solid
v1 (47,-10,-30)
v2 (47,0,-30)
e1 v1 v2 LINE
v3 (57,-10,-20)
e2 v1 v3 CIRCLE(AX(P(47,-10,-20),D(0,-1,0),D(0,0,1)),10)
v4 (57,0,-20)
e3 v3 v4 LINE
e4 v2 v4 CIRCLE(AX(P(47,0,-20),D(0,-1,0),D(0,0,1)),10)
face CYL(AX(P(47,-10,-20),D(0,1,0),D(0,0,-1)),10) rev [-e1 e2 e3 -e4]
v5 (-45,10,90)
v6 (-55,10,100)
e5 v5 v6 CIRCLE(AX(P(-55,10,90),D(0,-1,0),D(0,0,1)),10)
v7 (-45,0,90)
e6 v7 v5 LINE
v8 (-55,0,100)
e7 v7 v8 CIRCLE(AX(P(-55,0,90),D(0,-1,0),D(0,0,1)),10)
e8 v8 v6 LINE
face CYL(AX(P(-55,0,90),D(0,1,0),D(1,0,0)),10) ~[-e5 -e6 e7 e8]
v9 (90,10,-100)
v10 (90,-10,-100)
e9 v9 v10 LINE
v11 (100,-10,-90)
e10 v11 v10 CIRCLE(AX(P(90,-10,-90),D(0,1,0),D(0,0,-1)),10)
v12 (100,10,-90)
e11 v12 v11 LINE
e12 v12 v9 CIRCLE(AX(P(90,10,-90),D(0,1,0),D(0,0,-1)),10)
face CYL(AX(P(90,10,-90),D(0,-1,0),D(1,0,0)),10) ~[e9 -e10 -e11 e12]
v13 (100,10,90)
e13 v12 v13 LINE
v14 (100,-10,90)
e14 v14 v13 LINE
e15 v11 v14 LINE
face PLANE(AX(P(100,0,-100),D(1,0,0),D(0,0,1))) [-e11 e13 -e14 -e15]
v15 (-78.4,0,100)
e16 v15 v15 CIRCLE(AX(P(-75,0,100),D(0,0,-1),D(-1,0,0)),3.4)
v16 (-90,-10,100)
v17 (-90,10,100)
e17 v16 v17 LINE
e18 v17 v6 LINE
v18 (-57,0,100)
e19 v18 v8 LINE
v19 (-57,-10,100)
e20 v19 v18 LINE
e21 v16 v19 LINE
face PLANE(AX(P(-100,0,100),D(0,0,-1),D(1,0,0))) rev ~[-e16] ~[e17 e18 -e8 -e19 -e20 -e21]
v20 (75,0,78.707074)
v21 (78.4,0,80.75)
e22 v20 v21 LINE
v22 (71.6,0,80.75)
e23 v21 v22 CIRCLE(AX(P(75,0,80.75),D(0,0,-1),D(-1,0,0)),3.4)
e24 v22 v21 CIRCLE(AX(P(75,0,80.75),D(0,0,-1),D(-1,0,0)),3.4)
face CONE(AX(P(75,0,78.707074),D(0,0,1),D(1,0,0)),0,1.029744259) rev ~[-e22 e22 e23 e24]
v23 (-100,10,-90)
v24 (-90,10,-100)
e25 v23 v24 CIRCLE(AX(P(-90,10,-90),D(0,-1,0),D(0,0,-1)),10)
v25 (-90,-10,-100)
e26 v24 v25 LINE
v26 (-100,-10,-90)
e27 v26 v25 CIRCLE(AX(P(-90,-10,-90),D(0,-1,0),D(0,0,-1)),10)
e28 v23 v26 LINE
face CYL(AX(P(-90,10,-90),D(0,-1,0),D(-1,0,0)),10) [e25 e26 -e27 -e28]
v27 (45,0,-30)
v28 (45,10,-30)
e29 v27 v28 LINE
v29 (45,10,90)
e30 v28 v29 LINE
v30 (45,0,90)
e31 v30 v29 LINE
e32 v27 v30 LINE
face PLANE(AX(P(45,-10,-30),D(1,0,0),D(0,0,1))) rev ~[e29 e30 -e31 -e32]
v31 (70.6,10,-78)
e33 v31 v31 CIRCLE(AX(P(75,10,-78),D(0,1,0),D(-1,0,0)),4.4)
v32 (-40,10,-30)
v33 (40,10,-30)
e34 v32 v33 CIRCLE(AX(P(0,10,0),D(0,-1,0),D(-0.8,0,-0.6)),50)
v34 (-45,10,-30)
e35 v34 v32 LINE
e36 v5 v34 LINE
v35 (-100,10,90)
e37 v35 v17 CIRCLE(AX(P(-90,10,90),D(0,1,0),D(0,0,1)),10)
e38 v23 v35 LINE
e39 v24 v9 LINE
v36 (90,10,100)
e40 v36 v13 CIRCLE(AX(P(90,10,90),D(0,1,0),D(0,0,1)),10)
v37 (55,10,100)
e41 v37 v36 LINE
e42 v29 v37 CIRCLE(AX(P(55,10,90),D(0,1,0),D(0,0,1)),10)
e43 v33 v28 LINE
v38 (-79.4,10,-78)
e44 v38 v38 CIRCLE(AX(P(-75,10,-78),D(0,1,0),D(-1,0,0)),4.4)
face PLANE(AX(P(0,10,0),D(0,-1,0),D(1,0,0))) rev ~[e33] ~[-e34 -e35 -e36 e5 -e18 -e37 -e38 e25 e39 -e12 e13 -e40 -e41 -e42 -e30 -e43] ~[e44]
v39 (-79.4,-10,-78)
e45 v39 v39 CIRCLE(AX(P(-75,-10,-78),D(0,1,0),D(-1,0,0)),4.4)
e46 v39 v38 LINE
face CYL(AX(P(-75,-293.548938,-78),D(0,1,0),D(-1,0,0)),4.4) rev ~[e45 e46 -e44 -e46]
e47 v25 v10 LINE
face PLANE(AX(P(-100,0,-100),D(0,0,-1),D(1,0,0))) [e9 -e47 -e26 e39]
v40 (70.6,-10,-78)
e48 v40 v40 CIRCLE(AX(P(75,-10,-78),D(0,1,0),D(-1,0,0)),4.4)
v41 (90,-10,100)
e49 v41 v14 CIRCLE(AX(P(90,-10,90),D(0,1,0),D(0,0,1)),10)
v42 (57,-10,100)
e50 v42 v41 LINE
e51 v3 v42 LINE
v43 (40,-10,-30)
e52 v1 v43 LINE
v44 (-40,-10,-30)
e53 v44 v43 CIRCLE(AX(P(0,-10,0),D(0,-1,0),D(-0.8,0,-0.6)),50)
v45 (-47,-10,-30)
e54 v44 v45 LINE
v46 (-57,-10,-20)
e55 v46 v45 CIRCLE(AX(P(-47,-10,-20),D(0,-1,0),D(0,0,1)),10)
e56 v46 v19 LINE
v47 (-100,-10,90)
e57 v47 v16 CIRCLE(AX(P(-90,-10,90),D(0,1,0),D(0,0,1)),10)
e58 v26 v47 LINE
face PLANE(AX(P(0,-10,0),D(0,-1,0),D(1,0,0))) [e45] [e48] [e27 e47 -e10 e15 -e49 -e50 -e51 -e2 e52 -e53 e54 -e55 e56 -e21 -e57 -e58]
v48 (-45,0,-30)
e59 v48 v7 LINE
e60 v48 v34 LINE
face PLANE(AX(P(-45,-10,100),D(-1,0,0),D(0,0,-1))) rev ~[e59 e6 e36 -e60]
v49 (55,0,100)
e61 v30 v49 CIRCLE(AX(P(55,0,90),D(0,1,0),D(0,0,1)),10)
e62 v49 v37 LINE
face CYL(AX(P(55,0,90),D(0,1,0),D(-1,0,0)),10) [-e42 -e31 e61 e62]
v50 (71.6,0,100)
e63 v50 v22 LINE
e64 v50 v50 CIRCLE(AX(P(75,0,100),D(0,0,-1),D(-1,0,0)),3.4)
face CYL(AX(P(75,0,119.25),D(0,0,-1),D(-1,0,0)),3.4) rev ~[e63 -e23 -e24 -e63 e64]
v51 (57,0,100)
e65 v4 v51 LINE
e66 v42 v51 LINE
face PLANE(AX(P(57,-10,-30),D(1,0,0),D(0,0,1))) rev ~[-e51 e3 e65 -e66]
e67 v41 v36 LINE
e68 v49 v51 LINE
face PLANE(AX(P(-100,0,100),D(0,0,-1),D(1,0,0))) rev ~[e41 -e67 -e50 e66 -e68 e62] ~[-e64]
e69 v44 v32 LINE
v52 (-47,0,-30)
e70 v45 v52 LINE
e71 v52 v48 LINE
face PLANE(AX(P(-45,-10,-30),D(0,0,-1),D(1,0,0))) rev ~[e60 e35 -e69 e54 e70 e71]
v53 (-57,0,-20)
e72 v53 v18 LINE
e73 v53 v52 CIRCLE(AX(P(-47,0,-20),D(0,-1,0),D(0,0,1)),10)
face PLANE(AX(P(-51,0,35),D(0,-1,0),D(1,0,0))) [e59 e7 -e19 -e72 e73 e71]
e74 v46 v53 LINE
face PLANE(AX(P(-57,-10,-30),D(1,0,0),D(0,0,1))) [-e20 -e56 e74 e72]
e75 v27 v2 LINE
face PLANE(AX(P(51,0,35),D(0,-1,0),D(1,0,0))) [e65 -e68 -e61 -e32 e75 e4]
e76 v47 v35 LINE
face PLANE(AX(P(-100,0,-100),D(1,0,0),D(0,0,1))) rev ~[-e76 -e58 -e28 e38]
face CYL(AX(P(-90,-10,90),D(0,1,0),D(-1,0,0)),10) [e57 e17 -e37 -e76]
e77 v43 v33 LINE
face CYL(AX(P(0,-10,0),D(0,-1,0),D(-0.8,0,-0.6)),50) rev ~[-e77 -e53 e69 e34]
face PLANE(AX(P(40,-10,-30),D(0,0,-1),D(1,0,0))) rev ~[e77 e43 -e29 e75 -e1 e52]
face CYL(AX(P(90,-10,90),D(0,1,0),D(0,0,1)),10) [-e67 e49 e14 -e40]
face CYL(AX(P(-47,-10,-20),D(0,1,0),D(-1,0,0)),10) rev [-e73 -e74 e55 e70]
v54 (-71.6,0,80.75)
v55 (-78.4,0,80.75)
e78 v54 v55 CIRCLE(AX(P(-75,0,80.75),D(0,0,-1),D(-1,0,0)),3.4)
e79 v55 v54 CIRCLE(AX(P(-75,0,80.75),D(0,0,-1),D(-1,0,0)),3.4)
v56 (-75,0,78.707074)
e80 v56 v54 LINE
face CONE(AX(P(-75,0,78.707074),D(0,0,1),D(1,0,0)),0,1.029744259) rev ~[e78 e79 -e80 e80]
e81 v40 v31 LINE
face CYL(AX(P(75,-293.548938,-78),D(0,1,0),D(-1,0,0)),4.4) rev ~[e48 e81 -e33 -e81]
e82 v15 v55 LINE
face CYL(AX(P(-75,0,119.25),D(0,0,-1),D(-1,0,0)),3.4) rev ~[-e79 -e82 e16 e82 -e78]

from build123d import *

# Parameters (mm, degrees)
F0_W      = 200
F0_H      = 200
F1_DEPTH  = 10
F2_R      = 15
F3_DEPTH  = 20.001
F5_D      = 8.8
F7_DEPTH  = 20.001
F8_W      = 12
F8_H      = 130
F9_DEPTH  = 10
F10_R     = 10
F13_D     = 6.8
F13_DEPTH = 19.25
F13_TIP   = 2.0429261047


# Not quite as in the source:
# - two fillets or chamfers of one size are made in one step
# - a feature names something its author has since deleted; it is built from what else it names


with BuildPart() as f1:
    # F0 (on Front) → F1 (new body, symmetric)
    with BuildSketch(Plane.XZ):
        Rectangle(F0_W, F0_H)
    extrude(amount=F1_DEPTH, both=True)

    # F2 (on face) → F3 (cut, through all)
    with BuildSketch(Plane.XZ.offset(10)):
        Circle(F2_R)
    extrude(amount=-F3_DEPTH, mode=Mode.SUBTRACT)

    # F5 (through all)
    with Locations(Plane.XZ.offset(10)):
        with Locations((-75, -78), (75, -78)):
            Hole(F5_D / 2)

    # F6 (on face) → F7 (cut, through all)
    with BuildSketch(Plane.XZ.offset(10)):
        with BuildLine():
            Line((45, 100), (-45, 100))
            Line((-45, 100), (-45, -30))
            Line((-45, -30), (-40, -30))
            ThreePointArc((-40, -30), (0, -50), (40, -30))
            Line((40, -30), (45, -30))
            Line((45, -30), (45, 100))
        make_face()
    extrude(amount=-F7_DEPTH, mode=Mode.SUBTRACT)

    # F8 (on face) → F9 (cut)
    with BuildSketch(Plane.XZ.offset(10)):
        with Locations((-51, 35)):
            Rectangle(F8_W, F8_H)
        with Locations((51, 35)):
            Rectangle(F8_W, F8_H)
    extrude(amount=-F9_DEPTH, mode=Mode.SUBTRACT)

    # F10
    f10_edges = [f1.edges().sort_by_distance(p)[0] for p in [
        (-100, 0, 100),
        (-45, 5, 100),
        (45, 5, 100),
        (100, 0, 100),
        (100, 0, -100),
        (-100, 0, -100),
        (-57, -5, -30),
        (57, -5, -30),
    ]]
    fillet(f10_edges, radius=F10_R)

    # F13
    with Locations(Plane.XY.offset(100)):
        with Locations((-75, 0), (75, 0)):
            Hole(F13_D / 2, depth=F13_DEPTH)
            with Locations((0, 0, -(F13_DEPTH + F13_TIP / 2))):  # 118° drill point
                Cone(0, F13_D / 2, F13_TIP, mode=Mode.SUBTRACT)


solid = f1.part
